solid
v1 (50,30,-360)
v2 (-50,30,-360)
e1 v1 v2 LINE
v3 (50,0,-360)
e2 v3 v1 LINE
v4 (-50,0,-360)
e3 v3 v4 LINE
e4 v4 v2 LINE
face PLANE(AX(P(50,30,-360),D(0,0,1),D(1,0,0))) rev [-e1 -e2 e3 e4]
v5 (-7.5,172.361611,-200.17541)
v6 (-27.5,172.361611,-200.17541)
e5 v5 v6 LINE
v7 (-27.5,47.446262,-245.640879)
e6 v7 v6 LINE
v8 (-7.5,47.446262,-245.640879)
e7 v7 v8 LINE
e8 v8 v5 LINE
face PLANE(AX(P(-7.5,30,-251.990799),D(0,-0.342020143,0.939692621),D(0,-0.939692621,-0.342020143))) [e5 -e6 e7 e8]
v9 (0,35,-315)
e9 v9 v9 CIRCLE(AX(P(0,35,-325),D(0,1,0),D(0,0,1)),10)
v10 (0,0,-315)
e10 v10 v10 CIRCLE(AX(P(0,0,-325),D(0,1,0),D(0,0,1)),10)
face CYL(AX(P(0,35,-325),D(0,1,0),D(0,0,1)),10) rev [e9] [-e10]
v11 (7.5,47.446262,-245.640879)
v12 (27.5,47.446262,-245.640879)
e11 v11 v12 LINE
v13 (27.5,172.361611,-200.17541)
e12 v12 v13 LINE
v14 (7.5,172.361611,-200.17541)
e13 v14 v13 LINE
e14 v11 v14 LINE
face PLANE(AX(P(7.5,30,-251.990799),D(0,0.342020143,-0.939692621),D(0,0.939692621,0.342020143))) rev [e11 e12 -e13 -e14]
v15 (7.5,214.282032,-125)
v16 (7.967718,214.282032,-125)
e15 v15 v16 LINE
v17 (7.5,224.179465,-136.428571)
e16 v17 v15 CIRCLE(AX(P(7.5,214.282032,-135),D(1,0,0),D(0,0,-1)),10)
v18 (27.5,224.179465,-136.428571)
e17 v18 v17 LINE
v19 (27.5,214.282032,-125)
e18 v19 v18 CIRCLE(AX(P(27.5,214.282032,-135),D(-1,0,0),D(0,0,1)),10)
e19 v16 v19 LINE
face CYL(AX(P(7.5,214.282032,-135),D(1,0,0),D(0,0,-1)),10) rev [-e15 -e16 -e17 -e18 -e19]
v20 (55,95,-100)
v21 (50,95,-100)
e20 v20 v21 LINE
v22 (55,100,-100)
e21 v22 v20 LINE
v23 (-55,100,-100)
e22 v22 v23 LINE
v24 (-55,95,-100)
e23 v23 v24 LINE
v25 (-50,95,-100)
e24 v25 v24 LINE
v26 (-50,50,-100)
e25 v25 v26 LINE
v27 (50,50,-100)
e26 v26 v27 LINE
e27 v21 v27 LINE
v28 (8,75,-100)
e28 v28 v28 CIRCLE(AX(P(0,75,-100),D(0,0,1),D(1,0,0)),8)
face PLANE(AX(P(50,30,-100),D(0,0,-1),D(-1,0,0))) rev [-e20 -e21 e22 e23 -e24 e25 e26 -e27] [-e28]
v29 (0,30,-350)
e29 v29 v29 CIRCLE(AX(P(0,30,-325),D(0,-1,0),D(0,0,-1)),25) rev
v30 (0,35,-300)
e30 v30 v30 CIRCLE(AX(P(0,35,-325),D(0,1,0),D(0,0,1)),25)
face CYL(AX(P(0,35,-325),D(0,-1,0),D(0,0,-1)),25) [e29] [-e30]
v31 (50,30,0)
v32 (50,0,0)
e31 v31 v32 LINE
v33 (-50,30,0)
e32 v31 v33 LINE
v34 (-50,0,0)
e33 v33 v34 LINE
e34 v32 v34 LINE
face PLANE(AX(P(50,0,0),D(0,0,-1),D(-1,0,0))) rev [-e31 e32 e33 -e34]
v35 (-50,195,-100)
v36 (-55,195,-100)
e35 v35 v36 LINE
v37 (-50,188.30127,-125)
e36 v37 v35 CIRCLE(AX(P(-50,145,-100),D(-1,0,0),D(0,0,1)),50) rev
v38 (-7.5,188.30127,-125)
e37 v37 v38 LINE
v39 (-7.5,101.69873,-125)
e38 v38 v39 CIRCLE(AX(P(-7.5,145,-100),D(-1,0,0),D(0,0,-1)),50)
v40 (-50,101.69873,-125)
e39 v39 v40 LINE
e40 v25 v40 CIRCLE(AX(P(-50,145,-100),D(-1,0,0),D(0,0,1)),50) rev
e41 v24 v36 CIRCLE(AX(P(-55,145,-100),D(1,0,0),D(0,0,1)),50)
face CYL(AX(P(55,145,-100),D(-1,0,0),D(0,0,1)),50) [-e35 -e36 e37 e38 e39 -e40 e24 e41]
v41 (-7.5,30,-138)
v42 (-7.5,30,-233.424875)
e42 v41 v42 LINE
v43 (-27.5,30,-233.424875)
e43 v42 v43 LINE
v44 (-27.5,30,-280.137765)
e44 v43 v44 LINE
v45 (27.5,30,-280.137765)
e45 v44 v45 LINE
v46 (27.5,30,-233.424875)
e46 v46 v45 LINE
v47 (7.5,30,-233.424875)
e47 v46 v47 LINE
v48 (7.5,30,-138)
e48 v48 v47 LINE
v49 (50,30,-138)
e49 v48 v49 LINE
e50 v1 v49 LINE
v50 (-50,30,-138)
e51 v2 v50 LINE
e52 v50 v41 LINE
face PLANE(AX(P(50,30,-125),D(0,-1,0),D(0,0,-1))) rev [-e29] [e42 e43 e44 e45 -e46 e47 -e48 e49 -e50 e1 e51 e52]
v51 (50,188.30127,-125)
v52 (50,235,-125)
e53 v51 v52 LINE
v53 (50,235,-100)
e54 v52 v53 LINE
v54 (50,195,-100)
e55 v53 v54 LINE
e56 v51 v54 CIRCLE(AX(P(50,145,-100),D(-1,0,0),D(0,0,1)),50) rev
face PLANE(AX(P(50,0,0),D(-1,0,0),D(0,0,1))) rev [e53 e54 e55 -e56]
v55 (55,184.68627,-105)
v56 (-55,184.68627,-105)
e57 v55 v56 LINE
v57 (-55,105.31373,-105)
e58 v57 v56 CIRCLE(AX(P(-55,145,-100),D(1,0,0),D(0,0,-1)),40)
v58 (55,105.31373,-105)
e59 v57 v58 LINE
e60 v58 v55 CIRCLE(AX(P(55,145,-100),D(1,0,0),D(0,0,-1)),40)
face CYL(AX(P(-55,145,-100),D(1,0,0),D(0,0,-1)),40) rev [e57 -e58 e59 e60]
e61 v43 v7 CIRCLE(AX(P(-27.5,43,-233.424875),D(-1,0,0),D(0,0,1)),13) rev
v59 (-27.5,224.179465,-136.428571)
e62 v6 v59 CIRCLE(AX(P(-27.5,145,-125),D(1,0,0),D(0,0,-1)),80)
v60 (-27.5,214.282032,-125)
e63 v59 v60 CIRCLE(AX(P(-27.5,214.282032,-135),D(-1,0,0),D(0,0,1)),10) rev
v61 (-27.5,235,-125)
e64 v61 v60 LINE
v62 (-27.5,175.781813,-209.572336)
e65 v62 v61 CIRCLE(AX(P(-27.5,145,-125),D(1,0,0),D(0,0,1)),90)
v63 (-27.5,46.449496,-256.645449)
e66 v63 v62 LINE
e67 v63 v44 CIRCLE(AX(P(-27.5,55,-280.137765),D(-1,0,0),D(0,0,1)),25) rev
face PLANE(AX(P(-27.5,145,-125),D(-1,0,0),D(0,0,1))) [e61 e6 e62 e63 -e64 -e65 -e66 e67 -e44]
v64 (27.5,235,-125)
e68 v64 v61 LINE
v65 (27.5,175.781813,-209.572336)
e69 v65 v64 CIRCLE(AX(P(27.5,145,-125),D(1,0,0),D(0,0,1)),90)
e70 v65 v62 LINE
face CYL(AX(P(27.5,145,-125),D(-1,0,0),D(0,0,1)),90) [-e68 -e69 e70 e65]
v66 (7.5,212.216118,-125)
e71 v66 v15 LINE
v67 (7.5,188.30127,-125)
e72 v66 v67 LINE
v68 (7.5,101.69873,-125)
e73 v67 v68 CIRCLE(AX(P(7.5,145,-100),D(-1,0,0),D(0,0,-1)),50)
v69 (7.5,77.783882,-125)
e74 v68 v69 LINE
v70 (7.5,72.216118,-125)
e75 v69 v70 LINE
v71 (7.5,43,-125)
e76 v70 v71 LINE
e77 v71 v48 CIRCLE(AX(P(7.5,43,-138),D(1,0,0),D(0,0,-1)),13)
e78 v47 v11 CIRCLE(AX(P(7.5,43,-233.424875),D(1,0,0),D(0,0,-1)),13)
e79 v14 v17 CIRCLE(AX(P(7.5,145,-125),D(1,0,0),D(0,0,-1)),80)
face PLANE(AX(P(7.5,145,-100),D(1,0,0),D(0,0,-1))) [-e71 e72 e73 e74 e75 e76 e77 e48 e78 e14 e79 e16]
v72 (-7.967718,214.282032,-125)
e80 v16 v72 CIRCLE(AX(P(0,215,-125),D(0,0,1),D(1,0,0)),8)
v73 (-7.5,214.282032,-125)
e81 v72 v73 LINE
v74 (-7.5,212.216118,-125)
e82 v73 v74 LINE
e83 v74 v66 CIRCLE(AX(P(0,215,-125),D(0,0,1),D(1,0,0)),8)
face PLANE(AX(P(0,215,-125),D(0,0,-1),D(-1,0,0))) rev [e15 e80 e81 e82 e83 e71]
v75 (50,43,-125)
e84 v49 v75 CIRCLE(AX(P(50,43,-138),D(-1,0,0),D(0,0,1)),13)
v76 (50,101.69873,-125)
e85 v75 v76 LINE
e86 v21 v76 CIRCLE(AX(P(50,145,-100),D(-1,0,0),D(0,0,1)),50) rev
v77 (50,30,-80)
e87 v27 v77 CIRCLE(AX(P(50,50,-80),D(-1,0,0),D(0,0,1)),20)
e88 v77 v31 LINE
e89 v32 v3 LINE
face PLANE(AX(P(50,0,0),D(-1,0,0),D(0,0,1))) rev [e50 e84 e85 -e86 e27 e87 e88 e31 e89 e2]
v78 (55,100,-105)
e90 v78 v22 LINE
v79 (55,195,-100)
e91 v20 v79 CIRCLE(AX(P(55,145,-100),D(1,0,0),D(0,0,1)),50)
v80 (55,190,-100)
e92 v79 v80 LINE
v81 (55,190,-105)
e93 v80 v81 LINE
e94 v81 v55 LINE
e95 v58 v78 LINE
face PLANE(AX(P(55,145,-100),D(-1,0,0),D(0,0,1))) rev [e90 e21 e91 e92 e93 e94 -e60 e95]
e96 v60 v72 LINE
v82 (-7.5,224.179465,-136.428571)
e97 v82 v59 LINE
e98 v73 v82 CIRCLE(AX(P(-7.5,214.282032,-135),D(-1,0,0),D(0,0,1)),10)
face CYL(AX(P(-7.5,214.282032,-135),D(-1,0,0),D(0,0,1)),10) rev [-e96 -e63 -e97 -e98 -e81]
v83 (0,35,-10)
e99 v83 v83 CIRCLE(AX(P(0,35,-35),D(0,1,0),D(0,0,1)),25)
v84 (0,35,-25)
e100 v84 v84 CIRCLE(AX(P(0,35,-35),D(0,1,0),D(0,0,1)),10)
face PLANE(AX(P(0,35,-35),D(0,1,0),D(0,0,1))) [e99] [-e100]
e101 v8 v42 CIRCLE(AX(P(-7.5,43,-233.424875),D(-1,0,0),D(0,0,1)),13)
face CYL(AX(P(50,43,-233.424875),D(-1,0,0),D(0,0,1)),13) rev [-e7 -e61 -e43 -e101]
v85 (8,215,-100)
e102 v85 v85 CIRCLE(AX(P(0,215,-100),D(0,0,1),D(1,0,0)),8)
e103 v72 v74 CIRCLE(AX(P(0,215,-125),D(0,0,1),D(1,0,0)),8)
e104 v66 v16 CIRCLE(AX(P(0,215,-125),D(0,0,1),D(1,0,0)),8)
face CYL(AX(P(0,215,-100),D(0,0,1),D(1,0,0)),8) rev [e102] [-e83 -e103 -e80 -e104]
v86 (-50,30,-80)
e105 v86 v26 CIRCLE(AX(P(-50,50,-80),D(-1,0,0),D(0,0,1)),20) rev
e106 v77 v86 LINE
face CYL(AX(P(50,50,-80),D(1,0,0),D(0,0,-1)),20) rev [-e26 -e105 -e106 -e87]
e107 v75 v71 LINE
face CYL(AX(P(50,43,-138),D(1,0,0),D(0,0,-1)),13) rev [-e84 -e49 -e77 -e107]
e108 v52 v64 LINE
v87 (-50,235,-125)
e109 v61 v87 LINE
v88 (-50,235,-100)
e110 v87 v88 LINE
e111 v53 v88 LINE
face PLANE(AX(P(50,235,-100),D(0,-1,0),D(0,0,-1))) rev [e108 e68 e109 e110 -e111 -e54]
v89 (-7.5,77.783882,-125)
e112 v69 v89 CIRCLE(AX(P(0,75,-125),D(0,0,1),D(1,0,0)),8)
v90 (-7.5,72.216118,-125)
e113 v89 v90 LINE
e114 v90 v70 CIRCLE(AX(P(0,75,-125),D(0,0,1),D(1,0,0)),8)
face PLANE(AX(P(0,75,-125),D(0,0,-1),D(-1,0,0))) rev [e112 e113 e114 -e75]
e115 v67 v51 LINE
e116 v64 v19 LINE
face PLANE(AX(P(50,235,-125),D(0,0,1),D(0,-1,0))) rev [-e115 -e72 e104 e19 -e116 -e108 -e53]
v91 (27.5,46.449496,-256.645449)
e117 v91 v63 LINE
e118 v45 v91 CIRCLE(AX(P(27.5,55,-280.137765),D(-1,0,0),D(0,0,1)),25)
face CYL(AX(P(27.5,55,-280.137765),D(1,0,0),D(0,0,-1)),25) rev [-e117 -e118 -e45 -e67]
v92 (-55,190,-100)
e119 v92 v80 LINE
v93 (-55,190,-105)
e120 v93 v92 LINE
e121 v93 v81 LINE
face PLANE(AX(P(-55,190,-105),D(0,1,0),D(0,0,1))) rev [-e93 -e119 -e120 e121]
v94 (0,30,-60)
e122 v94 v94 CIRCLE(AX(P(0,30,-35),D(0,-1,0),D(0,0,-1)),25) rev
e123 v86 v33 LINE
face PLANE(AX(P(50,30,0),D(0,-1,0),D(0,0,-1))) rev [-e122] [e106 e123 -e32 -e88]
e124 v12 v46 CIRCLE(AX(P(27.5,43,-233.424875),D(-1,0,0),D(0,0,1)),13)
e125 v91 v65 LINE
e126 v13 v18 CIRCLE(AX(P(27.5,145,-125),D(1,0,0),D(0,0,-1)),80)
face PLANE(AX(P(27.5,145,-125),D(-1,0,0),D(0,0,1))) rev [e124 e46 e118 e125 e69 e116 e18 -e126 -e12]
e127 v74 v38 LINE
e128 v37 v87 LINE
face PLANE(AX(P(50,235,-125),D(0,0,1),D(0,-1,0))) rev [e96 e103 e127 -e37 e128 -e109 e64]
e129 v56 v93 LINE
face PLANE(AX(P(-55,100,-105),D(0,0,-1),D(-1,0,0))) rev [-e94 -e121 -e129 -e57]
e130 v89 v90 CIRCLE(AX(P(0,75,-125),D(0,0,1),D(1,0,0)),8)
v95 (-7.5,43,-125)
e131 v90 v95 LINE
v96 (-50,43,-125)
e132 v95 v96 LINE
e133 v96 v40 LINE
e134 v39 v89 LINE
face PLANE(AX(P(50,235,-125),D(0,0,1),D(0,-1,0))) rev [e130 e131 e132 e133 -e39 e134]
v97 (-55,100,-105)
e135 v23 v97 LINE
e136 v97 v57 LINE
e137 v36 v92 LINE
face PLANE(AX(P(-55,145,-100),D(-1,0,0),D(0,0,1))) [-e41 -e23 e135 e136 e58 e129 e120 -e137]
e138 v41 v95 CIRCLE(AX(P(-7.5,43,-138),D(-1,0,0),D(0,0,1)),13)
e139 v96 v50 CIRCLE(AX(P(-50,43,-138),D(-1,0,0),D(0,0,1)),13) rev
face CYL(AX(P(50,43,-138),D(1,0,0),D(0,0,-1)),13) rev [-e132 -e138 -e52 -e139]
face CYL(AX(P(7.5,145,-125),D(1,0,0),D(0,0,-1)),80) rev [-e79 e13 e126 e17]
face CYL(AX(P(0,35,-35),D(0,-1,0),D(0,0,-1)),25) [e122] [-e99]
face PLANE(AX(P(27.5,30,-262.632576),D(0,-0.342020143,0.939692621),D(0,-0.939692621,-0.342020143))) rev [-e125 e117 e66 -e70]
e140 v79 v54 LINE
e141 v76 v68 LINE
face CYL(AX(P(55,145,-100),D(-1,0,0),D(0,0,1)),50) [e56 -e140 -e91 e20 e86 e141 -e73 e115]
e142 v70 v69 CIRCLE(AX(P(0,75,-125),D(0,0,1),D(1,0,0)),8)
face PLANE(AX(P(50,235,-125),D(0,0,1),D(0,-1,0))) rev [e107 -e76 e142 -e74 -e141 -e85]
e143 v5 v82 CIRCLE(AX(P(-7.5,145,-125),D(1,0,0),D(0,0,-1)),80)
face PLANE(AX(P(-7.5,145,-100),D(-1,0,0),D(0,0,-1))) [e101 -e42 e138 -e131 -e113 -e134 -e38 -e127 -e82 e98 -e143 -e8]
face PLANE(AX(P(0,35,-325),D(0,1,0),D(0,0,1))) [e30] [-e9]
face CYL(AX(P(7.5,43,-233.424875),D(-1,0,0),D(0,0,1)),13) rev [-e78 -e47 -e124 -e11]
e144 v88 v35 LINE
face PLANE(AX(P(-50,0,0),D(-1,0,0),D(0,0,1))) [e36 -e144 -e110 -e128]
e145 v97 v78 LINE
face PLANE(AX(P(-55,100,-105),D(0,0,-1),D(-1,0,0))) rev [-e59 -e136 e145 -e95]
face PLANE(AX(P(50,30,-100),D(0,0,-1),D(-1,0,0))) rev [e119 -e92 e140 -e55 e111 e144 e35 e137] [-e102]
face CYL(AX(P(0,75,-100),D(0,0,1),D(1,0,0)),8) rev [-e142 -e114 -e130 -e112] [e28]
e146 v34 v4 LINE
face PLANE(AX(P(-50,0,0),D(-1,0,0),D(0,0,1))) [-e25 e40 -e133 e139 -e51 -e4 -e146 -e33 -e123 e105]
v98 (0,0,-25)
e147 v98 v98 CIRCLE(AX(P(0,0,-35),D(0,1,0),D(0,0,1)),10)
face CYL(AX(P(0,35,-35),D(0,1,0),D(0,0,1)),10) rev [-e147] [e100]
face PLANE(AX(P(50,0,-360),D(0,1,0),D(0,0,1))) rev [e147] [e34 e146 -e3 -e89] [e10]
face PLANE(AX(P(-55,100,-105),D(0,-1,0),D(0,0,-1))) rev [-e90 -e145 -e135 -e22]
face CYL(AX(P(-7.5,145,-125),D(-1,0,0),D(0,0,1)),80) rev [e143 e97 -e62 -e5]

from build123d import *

# Parameters (mm, degrees)
BOSS_EXTRUDE1_DEPTH     = 50
BOSS_EXTRUDE2_DEPTH     = 55
BOSS_EXTRUDE3_DEPTH     = 27.5
CUT_EXTRUDE1_DEPTH      = 20
CUT_EXTRUDE2_DEPTH      = 434.416658655
CUT_EXTRUDE2_DEPTH_BACK = 434.416658655
CUT_EXTRUDE3_DEPTH      = 444.762323773
CUT_EXTRUDE3_DEPTH_BACK = 444.762323773
SKETCH6_W               = 10
SKETCH6_H               = 90
SKETCH7_R               = 25
BOSS_EXTRUDE4_DEPTH     = 5
LPATTERN1_COUNT         = 2
LPATTERN1_PITCH         = 290
HOLE1_D                 = 20
HOLE2_D                 = 16
HOLE2_DEPTH             = 25
LPATTERN2_COUNT         = 2
LPATTERN2_PITCH         = 140
FILLET1_R               = 25
FILLET2_R               = 13
FILLET3_R               = 20
FILLET4_R               = 10


with BuildPart() as part:
    # Sketch1 → Boss-Extrude1 (new, symmetric)
    with BuildSketch(Plane(origin=(0, 0, 0), x_dir=(0, 0, -1), z_dir=(1, 0, 0))):
        Polygon((0, 0), (0, 30), (100, 30), (100, 235), (125, 235), (125, 30), (360, 30), (360, 0), align=None)
    extrude(amount=BOSS_EXTRUDE1_DEPTH, both=True)

    # Sketch2 → Boss-Extrude2 (add, symmetric)
    with BuildSketch(Plane(origin=(0, 0, 0), x_dir=(0, 0, -1), z_dir=(1, 0, 0))):
        with BuildLine():
            Line((100, 195), (100, 95))
            ThreePointArc((100, 95), (150, 145), (100, 195))
        make_face()
    extrude(amount=BOSS_EXTRUDE2_DEPTH, both=True)

    # Sketch3 → Boss-Extrude3 (add, symmetric)
    with BuildSketch(Plane(origin=(0, 0, 0), x_dir=(0, 0, -1), z_dir=(1, 0, 0))):
        with BuildLine():
            Line((125, 235), (125, 30))
            Line((125, 30), (262.632576463, 30))
            Line((262.632576463, 30), (209.572335871, 175.781812899))
            ThreePointArc((209.572335871, 175.781812899), (176.621879272, 218.723683986), (125, 235))
        make_face()
    extrude(amount=BOSS_EXTRUDE3_DEPTH, both=True)

    # Sketch4 → Cut-Extrude1 (cut)
    with BuildSketch(Plane(origin=(27.5, 0, 0), x_dir=(0, 0, -1), z_dir=(1, 0, 0))):
        with BuildLine():
            Line((125, 225), (125, 188.301270189))
            ThreePointArc((125, 188.301270189), (150, 145), (125, 101.698729811))
            Line((125, 101.698729811), (125, 30))
            Line((125, 30), (251.990798739, 30))
            Line((251.990798739, 30), (200.175409663, 172.361611466))
            ThreePointArc((200.175409663, 172.361611466), (170.886114908, 210.532163543), (125, 225))
        make_face()
    cut_extrude1 = extrude(amount=-CUT_EXTRUDE1_DEPTH, mode=Mode.SUBTRACT)

    # Mirror1: Cut-Extrude1 across plane
    add(cut_extrude1.mirror(Plane(origin=(0, 0, 0), x_dir=(0, 0, 1), z_dir=(1, 0, 0))), mode=Mode.SUBTRACT)

    # Sketch5 → Cut-Extrude2 (cut, two sides: drawn at the far end of the back side and taken through both)
    with BuildSketch(Plane(origin=(0, 0, 0), x_dir=(0, 0, -1), z_dir=(1, 0, 0)).offset(-CUT_EXTRUDE2_DEPTH_BACK)):
        with BuildLine():
            Line((100, 185), (100, 105))
            ThreePointArc((100, 105), (140, 145), (100, 185))
        make_face()
    extrude(amount=CUT_EXTRUDE2_DEPTH + CUT_EXTRUDE2_DEPTH_BACK, mode=Mode.SUBTRACT)

    # Sketch6 → Cut-Extrude3 (cut, two sides: drawn at the far end of the back side and taken through both)
    with BuildSketch(Plane(origin=(55, 0, 0), x_dir=(0, 0, -1), z_dir=(1, 0, 0)).offset(-CUT_EXTRUDE3_DEPTH_BACK)):
        with Locations((100, 145)):
            Rectangle(SKETCH6_W, SKETCH6_H)
    extrude(amount=CUT_EXTRUDE3_DEPTH + CUT_EXTRUDE3_DEPTH_BACK, mode=Mode.SUBTRACT)

    # Sketch7 → Boss-Extrude4 (add)
    with BuildSketch(Plane(origin=(0, 30, 0), x_dir=(1, 0, 0), z_dir=(0, 1, 0))):
        with Locations(Location((0, 35, 0), (0, 0, 90))):
            Circle(SKETCH7_R)
    boss_extrude4 = extrude(amount=BOSS_EXTRUDE4_DEPTH)

    # LPattern1: Boss-Extrude4 ×2
    with Locations(*[(0, 0, -i * LPATTERN1_PITCH) for i in range(1, LPATTERN1_COUNT)]):
        add(boss_extrude4)

    # Hole1 (through all)
    with Locations(Plane(origin=(0, 35, 0), x_dir=(1, 0, 0), z_dir=(0, 1, 0))):
        with Locations((0, 35), (0, 325)):
            Hole(HOLE1_D / 2)

    # Hole2
    with Locations(Plane.XY.offset(-100)):
        with Locations((0, 215)):
            hole2 = Hole(HOLE2_D / 2, depth=HOLE2_DEPTH)

    # LPattern2: Hole2 ×2
    with Locations(*[(0, -i * LPATTERN2_PITCH, 0) for i in range(1, LPATTERN2_COUNT)]):
        add(hole2, mode=Mode.SUBTRACT)

    # Fillet1
    fillet1_edges = [part.edges().sort_by_distance(p)[0] for p in [
        (0, 30, -262.632576463),
    ]]
    fillet(fillet1_edges, radius=FILLET1_R)

    # Fillet2
    fillet2_edges = [part.edges().sort_by_distance(p)[0] for p in [
        (28.75, 30, -125),
        (-28.75, 30, -125),
        (17.5, 30, -251.990798739),
        (-17.5, 30, -251.990798739),
    ]]
    fillet(fillet2_edges, radius=FILLET2_R)

    # Fillet3
    fillet3_edges = [part.edges().sort_by_distance(p)[0] for p in [
        (0, 30, -100),
    ]]
    fillet(fillet3_edges, radius=FILLET3_R)

    # Fillet4
    # the kernel refuses this fillet: 10 mm, written as the material it adds along each edge
    with BuildSketch(Plane(origin=(27.5, 225, -125), x_dir=(0, -1, 0), z_dir=(-1, 0, 0))) as fillet4_piece_1:
        with BuildLine():
            CenterArc((10.717967697, -10), FILLET4_R, 90, 98.213210702)
            ThreePointArc((0.820534511, -11.428571429), (0.205397303, -5.728994715), (0, 0))
            Line((0, 0), (10.717967697, 0))
        make_face()
    extrude(amount=48.644973575)
    with BuildSketch(Plane(origin=(-27.5, 225, -125), x_dir=(0, -1, 0), z_dir=(1, 0, 0))) as fillet4_piece_2:
        with BuildLine():
            CenterArc((10.717967697, 10), FILLET4_R, 171.786789298, 98.213210702)
            ThreePointArc((0.820534511, 11.428571429), (0.205397303, 5.728994715), (0, 0))
            Line((0, 0), (10.717967697, 0))
        make_face()
    extrude(amount=48.644973575)


solid = part.part
